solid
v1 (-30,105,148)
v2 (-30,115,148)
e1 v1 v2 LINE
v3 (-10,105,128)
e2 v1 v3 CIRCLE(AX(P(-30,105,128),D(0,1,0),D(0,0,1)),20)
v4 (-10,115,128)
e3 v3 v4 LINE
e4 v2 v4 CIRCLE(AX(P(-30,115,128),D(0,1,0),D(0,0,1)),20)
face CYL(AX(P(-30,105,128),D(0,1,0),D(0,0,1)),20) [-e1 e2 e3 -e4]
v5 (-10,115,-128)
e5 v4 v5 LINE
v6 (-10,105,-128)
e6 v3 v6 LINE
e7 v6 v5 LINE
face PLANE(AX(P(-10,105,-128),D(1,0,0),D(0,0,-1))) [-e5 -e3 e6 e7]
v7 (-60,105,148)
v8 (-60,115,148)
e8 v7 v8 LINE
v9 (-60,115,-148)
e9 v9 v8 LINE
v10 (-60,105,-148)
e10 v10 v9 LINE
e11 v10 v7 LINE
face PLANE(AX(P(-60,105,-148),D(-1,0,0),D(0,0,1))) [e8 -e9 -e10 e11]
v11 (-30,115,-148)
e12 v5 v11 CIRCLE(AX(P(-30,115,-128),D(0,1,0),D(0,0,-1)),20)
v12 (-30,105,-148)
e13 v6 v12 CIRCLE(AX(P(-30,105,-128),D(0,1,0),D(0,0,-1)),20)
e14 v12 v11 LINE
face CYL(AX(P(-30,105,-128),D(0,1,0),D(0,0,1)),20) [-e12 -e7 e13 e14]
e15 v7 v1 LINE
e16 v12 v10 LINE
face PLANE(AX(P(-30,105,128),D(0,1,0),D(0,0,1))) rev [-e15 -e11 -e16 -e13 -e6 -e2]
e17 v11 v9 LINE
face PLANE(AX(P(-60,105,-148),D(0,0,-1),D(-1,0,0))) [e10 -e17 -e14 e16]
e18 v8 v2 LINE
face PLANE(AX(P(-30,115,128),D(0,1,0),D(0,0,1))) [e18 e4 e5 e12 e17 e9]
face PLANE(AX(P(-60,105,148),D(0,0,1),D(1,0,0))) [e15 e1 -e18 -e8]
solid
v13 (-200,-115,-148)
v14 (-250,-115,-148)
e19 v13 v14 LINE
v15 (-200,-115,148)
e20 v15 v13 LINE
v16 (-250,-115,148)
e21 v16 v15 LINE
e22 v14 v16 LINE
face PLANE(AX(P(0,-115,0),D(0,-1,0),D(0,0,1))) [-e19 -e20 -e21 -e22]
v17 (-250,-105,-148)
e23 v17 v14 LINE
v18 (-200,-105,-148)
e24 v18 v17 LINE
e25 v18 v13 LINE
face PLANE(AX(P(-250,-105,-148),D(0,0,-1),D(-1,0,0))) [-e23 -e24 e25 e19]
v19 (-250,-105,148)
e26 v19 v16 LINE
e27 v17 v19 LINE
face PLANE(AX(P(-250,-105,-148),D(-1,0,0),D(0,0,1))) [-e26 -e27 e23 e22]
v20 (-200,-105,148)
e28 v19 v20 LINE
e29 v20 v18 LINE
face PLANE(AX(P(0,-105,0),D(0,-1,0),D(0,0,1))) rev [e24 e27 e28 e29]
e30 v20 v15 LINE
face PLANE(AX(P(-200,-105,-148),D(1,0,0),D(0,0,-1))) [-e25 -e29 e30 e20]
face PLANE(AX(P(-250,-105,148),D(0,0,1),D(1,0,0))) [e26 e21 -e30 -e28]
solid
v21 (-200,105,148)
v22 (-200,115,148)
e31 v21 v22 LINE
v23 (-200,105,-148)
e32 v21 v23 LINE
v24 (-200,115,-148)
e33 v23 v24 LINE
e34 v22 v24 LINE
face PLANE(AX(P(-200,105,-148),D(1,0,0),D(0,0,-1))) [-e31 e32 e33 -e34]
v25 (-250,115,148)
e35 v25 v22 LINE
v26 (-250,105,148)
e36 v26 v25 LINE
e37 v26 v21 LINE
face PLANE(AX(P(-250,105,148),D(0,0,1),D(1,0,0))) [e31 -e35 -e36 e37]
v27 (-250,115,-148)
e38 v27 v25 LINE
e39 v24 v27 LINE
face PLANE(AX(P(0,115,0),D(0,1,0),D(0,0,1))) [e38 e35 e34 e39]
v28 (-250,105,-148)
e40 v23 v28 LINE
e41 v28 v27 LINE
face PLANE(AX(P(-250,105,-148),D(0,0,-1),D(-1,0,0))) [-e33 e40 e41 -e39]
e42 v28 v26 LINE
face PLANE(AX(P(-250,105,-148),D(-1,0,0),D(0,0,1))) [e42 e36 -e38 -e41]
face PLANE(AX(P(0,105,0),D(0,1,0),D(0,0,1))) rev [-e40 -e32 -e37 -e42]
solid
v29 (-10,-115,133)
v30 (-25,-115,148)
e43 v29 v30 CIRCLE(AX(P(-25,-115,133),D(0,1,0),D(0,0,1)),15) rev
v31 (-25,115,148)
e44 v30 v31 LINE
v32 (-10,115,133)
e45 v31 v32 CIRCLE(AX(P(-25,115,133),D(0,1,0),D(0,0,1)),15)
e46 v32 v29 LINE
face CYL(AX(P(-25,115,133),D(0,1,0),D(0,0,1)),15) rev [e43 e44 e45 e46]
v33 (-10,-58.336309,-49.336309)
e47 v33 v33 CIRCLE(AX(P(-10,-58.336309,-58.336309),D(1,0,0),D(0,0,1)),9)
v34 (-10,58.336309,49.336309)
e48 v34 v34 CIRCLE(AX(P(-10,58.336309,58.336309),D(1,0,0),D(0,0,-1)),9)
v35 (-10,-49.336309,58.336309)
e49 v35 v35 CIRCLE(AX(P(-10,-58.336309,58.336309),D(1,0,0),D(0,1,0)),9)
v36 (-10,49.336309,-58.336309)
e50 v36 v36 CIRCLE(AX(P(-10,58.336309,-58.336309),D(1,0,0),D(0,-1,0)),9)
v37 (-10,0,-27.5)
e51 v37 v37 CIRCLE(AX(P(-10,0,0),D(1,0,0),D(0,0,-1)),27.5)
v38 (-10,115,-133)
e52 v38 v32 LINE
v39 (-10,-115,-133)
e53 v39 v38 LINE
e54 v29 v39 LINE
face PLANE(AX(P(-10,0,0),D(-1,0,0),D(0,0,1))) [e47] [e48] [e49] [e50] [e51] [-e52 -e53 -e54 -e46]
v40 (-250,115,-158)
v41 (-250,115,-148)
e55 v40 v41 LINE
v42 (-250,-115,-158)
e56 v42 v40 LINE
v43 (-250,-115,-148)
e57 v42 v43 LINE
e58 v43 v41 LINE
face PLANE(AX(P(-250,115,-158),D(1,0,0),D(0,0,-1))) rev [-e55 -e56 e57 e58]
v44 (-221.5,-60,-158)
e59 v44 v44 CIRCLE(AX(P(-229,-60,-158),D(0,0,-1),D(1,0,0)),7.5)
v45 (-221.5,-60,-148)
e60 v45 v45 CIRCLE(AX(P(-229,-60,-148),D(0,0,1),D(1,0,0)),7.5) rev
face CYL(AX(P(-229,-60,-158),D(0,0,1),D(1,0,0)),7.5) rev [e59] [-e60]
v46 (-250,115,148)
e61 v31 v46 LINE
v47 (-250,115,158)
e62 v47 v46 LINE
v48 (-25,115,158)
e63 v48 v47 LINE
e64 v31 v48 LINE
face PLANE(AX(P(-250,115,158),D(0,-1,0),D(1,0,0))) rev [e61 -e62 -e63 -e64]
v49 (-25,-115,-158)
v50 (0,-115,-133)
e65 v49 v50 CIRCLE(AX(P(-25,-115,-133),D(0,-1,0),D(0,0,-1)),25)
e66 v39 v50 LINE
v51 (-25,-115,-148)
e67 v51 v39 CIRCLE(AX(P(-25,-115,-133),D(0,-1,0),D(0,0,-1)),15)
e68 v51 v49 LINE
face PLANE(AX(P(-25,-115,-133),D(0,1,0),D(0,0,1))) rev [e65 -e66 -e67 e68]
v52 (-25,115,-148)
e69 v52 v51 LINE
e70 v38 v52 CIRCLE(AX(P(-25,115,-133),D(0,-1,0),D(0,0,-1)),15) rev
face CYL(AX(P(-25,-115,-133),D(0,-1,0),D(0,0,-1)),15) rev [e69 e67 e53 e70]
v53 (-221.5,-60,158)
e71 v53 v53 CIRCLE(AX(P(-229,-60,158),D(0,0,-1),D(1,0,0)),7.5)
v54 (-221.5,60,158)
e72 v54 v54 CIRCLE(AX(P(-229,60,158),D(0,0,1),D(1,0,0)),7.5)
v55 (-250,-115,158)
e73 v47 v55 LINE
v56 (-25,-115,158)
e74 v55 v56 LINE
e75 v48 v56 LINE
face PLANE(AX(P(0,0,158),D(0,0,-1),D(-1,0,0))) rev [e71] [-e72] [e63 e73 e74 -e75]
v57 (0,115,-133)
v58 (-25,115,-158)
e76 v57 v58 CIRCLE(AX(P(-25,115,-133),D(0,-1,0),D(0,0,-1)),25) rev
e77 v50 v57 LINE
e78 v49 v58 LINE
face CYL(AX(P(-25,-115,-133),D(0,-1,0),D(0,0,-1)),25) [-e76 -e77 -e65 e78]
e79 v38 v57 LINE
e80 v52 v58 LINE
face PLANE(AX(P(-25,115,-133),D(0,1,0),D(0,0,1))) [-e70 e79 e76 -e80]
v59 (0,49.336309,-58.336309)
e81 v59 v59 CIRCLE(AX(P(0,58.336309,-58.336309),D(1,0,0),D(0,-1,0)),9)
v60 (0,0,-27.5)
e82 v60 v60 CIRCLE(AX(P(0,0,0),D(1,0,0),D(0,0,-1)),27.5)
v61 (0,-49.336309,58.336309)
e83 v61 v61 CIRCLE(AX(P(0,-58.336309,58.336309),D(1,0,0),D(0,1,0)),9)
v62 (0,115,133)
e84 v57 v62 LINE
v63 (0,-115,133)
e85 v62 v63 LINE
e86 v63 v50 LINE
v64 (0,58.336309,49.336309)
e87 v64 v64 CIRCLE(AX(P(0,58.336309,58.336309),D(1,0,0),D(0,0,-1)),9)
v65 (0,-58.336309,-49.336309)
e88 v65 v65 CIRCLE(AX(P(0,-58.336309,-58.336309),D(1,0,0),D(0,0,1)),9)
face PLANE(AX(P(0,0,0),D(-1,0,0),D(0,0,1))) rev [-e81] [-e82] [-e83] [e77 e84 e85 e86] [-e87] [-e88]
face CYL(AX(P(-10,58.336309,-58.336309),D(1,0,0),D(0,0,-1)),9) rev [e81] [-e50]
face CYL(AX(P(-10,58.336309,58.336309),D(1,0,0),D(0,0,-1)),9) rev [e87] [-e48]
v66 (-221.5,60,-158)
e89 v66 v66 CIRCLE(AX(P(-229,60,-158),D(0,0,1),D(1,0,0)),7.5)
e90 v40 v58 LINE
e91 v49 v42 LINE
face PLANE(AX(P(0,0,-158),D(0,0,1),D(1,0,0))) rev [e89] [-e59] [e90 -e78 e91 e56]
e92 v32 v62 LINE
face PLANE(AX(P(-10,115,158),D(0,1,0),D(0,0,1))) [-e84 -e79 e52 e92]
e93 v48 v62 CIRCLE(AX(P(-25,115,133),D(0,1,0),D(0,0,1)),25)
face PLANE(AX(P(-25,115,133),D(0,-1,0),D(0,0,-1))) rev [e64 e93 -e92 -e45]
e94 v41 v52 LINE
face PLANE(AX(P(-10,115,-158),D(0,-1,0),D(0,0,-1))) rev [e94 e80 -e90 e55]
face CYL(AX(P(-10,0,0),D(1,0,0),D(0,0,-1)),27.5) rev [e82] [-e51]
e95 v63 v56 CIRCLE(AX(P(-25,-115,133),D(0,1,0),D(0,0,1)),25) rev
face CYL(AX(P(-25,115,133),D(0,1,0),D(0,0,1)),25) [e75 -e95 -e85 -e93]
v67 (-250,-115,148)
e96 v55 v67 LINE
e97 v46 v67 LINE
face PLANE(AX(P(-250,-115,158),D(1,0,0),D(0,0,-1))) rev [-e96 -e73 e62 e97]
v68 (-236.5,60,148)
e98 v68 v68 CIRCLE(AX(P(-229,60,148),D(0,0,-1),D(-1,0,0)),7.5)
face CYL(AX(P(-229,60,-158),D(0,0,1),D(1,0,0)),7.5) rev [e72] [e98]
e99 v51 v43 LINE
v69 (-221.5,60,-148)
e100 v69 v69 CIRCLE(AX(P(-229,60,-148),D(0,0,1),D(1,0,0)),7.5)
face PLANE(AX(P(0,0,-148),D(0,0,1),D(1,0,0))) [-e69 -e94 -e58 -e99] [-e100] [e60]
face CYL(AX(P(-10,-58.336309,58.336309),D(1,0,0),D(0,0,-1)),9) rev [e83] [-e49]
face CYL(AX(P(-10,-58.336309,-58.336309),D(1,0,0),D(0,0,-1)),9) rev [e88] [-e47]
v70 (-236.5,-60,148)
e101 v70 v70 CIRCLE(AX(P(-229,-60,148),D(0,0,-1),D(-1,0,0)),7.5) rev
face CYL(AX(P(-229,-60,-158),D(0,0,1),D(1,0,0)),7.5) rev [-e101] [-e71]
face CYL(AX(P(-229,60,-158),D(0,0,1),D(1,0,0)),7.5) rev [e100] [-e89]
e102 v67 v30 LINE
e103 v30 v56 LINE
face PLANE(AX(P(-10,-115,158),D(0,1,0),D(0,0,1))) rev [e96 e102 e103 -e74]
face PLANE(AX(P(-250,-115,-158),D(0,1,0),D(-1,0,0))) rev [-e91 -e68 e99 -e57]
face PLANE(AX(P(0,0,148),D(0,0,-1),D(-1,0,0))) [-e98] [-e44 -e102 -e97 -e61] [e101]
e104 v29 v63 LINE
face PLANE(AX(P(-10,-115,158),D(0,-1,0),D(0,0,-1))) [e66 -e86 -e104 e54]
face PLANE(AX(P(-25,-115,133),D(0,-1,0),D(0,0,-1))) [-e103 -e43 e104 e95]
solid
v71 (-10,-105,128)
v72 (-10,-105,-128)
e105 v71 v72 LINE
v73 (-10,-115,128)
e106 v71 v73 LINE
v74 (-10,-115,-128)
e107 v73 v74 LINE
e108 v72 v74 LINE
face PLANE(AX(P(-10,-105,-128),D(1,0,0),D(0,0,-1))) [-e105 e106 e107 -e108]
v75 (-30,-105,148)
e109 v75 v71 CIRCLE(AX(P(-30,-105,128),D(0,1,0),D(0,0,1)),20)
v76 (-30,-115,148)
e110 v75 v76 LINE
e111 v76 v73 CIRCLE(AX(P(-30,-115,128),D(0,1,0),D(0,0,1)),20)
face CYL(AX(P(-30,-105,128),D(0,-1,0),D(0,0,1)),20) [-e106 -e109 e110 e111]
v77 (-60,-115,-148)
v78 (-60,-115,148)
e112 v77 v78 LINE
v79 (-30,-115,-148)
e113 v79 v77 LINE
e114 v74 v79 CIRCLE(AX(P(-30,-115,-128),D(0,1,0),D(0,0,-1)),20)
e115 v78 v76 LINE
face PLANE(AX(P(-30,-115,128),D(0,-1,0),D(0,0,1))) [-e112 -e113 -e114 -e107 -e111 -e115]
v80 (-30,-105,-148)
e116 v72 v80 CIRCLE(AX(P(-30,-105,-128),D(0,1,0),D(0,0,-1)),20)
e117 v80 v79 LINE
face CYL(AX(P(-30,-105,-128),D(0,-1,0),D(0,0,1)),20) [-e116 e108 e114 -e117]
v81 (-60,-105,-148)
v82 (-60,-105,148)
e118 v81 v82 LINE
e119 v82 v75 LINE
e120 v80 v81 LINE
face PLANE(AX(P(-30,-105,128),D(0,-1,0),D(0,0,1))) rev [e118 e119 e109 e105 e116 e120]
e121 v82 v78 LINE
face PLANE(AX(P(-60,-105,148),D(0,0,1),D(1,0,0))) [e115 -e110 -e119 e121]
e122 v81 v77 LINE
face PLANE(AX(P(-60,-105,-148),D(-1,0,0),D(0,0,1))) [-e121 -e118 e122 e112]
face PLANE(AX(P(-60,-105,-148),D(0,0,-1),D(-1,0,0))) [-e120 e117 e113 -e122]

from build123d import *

# Parameters (mm, degrees)
SKETCH1_W                      = 316
SKETCH1_H                      = 230
BASE_FLANGE1_DEPTH             = 10
EDGE_FLANGE1_STRIP_W           = 70
EDGE_FLANGE1_STRIP_H           = 10
EDGE_FLANGE1_STRIP_CUT_DEPTH   = 230
EDGE_FLANGE1_STRIP_2_W         = 70
EDGE_FLANGE1_STRIP_2_H         = 10
EDGE_FLANGE1_STRIP_CUT_2_DEPTH = 230
EDGE_FLANGE1_DEPTH             = 230
EDGE_FLANGE1_BEND_DEPTH        = 230
SKETCH12_R                     = 27.5
CUT_EXTRUDE1_DEPTH             = 10
SKETCH13_R                     = 7.5
CUT_EXTRUDE2_DEPTH             = 420.023865669
SKETCH14_R                     = 9
CUT_EXTRUDE3_DEPTH             = 10
BOSS_EXTRUDE1_DEPTH            = 10
SKETCH15_W                     = 50
SKETCH15_H                     = 296
BOSS_EXTRUDE1_2_DEPTH          = 10
CIRPATTERN1_COUNT              = 4


# Sheet-metal steps are written as plain solids
with BuildPart() as part:
    # Sketch1 → Base-Flange1 (new body)
    with BuildSketch(Plane(origin=(0, 0, 0), x_dir=(0, 0, -1), z_dir=(1, 0, 0))):
        Rectangle(SKETCH1_W, SKETCH1_H)
    extrude(amount=-BASE_FLANGE1_DEPTH)

    # Edge-Flange1 strip (across the edge) → Edge-Flange1 strip cut (cut)
    with BuildSketch(Plane(origin=(-10, -115, 158), x_dir=(0, 0, -1), z_dir=(0, 1, 0))):
        with Locations((-10, -5)):
            Rectangle(EDGE_FLANGE1_STRIP_W, EDGE_FLANGE1_STRIP_H)
    extrude(amount=EDGE_FLANGE1_STRIP_CUT_DEPTH, mode=Mode.SUBTRACT)

    # Edge-Flange1 strip 2 (across the edge) → Edge-Flange1 strip cut 2 (cut)
    with BuildSketch(Plane(origin=(-10, 115, -158), x_dir=(0, 0, 1), z_dir=(0, -1, 0))):
        with Locations((-10, -5)):
            Rectangle(EDGE_FLANGE1_STRIP_2_W, EDGE_FLANGE1_STRIP_2_H)
    extrude(amount=EDGE_FLANGE1_STRIP_CUT_2_DEPTH, mode=Mode.SUBTRACT)

    # Edge-Flange1 section (across the edge) → Edge-Flange1 (add)
    with BuildSketch(Plane(origin=(-10, -115, 158), x_dir=(0, 0, -1), z_dir=(0, 1, 0))):
        with BuildLine():
            Line((0, 15), (0, 240))
            Line((0, 240), (10, 240))
            Line((10, 240), (10, 15))
            ThreePointArc((10, 15), (14.393398282, 4.393398282), (25, 0))
            Line((25, 0), (25, -10))
            ThreePointArc((25, -10), (7.32233047, -2.67766953), (0, 15))
        make_face()
    extrude(amount=EDGE_FLANGE1_DEPTH)

    # Edge-Flange1 section 2 (across the edge) → Edge-Flange1 bend (add)
    with BuildSketch(Plane(origin=(-10, 115, -158), x_dir=(0, 0, 1), z_dir=(0, -1, 0))):
        with BuildLine():
            Line((0, 15), (0, 240))
            Line((0, 240), (10, 240))
            Line((10, 240), (10, 15))
            ThreePointArc((10, 15), (14.393398282, 4.393398282), (25, 0))
            Line((25, 0), (25, -10))
            ThreePointArc((25, -10), (7.32233047, -2.67766953), (0, 15))
        make_face()
    extrude(amount=EDGE_FLANGE1_BEND_DEPTH)

    # Sketch12 → Cut-Extrude1 (cut)
    with BuildSketch(Plane(origin=(0, 0, 0), x_dir=(0, 0, -1), z_dir=(1, 0, 0))):
        Circle(SKETCH12_R)
    extrude(amount=-CUT_EXTRUDE1_DEPTH, mode=Mode.SUBTRACT)

    # Sketch13 → Cut-Extrude2 (cut, through all)
    with BuildSketch(Plane.XY.offset(158)):
        with Locations((-229, 60)):
            Circle(SKETCH13_R)
    cut_extrude2 = extrude(amount=-CUT_EXTRUDE2_DEPTH, mode=Mode.SUBTRACT)

    # Sketch14 → Cut-Extrude3 (cut)
    with BuildSketch(Plane(origin=(0, 0, 0), x_dir=(0, 0, -1), z_dir=(1, 0, 0))):
        with Locations((-58.336309448, 58.336309448)):
            Circle(SKETCH14_R)
    cut_extrude3 = extrude(amount=-CUT_EXTRUDE3_DEPTH, mode=Mode.SUBTRACT)

    # Mirror1: Cut-Extrude2 across plane
    add(cut_extrude2.mirror(Plane.ZX), mode=Mode.SUBTRACT)

    # CirPattern1: Cut-Extrude3 ×4 about axis
    cirpattern1_axis = Axis((0, 0, 0), (1, 0, 0))
    for i in range(1, CIRPATTERN1_COUNT):
        add(cut_extrude3.rotate(cirpattern1_axis, i * 360 / CIRPATTERN1_COUNT), mode=Mode.SUBTRACT)


with BuildPart() as body_2:
    # Sketch15 → Boss-Extrude1 (new body)
    with BuildSketch(Plane(origin=(0, 115, 0), x_dir=(1, 0, 0), z_dir=(0, 1, 0))):
        with BuildLine():
            Line((-60, 148), (-30, 148))
            ThreePointArc((-30, 148), (-15.857864376, 142.142135624), (-10, 128))
            Line((-10, 128), (-10, -128))
            ThreePointArc((-10, -128), (-15.857864376, -142.142135624), (-30, -148))
            Line((-30, -148), (-60, -148))
            Line((-60, -148), (-60, 148))
        make_face()
    extrude(amount=-BOSS_EXTRUDE1_DEPTH)


with BuildPart() as body_3:
    # Sketch15 → Boss-Extrude1 2 (new body)
    with BuildSketch(Plane(origin=(0, 115, 0), x_dir=(1, 0, 0), z_dir=(0, 1, 0))):
        with Locations((-225, 0)):
            Rectangle(SKETCH15_W, SKETCH15_H)
    extrude(amount=-BOSS_EXTRUDE1_2_DEPTH)


with BuildPart() as body_4:
    # Mirror2: mirrored copy
    add(body_2.part.mirror(Plane.ZX))


with BuildPart() as body_5:
    # Mirror2 2: mirrored copy
    add(body_3.part.mirror(Plane.ZX))


solid = Compound([part.part, body_2.part, body_3.part, body_4.part, body_5.part])
